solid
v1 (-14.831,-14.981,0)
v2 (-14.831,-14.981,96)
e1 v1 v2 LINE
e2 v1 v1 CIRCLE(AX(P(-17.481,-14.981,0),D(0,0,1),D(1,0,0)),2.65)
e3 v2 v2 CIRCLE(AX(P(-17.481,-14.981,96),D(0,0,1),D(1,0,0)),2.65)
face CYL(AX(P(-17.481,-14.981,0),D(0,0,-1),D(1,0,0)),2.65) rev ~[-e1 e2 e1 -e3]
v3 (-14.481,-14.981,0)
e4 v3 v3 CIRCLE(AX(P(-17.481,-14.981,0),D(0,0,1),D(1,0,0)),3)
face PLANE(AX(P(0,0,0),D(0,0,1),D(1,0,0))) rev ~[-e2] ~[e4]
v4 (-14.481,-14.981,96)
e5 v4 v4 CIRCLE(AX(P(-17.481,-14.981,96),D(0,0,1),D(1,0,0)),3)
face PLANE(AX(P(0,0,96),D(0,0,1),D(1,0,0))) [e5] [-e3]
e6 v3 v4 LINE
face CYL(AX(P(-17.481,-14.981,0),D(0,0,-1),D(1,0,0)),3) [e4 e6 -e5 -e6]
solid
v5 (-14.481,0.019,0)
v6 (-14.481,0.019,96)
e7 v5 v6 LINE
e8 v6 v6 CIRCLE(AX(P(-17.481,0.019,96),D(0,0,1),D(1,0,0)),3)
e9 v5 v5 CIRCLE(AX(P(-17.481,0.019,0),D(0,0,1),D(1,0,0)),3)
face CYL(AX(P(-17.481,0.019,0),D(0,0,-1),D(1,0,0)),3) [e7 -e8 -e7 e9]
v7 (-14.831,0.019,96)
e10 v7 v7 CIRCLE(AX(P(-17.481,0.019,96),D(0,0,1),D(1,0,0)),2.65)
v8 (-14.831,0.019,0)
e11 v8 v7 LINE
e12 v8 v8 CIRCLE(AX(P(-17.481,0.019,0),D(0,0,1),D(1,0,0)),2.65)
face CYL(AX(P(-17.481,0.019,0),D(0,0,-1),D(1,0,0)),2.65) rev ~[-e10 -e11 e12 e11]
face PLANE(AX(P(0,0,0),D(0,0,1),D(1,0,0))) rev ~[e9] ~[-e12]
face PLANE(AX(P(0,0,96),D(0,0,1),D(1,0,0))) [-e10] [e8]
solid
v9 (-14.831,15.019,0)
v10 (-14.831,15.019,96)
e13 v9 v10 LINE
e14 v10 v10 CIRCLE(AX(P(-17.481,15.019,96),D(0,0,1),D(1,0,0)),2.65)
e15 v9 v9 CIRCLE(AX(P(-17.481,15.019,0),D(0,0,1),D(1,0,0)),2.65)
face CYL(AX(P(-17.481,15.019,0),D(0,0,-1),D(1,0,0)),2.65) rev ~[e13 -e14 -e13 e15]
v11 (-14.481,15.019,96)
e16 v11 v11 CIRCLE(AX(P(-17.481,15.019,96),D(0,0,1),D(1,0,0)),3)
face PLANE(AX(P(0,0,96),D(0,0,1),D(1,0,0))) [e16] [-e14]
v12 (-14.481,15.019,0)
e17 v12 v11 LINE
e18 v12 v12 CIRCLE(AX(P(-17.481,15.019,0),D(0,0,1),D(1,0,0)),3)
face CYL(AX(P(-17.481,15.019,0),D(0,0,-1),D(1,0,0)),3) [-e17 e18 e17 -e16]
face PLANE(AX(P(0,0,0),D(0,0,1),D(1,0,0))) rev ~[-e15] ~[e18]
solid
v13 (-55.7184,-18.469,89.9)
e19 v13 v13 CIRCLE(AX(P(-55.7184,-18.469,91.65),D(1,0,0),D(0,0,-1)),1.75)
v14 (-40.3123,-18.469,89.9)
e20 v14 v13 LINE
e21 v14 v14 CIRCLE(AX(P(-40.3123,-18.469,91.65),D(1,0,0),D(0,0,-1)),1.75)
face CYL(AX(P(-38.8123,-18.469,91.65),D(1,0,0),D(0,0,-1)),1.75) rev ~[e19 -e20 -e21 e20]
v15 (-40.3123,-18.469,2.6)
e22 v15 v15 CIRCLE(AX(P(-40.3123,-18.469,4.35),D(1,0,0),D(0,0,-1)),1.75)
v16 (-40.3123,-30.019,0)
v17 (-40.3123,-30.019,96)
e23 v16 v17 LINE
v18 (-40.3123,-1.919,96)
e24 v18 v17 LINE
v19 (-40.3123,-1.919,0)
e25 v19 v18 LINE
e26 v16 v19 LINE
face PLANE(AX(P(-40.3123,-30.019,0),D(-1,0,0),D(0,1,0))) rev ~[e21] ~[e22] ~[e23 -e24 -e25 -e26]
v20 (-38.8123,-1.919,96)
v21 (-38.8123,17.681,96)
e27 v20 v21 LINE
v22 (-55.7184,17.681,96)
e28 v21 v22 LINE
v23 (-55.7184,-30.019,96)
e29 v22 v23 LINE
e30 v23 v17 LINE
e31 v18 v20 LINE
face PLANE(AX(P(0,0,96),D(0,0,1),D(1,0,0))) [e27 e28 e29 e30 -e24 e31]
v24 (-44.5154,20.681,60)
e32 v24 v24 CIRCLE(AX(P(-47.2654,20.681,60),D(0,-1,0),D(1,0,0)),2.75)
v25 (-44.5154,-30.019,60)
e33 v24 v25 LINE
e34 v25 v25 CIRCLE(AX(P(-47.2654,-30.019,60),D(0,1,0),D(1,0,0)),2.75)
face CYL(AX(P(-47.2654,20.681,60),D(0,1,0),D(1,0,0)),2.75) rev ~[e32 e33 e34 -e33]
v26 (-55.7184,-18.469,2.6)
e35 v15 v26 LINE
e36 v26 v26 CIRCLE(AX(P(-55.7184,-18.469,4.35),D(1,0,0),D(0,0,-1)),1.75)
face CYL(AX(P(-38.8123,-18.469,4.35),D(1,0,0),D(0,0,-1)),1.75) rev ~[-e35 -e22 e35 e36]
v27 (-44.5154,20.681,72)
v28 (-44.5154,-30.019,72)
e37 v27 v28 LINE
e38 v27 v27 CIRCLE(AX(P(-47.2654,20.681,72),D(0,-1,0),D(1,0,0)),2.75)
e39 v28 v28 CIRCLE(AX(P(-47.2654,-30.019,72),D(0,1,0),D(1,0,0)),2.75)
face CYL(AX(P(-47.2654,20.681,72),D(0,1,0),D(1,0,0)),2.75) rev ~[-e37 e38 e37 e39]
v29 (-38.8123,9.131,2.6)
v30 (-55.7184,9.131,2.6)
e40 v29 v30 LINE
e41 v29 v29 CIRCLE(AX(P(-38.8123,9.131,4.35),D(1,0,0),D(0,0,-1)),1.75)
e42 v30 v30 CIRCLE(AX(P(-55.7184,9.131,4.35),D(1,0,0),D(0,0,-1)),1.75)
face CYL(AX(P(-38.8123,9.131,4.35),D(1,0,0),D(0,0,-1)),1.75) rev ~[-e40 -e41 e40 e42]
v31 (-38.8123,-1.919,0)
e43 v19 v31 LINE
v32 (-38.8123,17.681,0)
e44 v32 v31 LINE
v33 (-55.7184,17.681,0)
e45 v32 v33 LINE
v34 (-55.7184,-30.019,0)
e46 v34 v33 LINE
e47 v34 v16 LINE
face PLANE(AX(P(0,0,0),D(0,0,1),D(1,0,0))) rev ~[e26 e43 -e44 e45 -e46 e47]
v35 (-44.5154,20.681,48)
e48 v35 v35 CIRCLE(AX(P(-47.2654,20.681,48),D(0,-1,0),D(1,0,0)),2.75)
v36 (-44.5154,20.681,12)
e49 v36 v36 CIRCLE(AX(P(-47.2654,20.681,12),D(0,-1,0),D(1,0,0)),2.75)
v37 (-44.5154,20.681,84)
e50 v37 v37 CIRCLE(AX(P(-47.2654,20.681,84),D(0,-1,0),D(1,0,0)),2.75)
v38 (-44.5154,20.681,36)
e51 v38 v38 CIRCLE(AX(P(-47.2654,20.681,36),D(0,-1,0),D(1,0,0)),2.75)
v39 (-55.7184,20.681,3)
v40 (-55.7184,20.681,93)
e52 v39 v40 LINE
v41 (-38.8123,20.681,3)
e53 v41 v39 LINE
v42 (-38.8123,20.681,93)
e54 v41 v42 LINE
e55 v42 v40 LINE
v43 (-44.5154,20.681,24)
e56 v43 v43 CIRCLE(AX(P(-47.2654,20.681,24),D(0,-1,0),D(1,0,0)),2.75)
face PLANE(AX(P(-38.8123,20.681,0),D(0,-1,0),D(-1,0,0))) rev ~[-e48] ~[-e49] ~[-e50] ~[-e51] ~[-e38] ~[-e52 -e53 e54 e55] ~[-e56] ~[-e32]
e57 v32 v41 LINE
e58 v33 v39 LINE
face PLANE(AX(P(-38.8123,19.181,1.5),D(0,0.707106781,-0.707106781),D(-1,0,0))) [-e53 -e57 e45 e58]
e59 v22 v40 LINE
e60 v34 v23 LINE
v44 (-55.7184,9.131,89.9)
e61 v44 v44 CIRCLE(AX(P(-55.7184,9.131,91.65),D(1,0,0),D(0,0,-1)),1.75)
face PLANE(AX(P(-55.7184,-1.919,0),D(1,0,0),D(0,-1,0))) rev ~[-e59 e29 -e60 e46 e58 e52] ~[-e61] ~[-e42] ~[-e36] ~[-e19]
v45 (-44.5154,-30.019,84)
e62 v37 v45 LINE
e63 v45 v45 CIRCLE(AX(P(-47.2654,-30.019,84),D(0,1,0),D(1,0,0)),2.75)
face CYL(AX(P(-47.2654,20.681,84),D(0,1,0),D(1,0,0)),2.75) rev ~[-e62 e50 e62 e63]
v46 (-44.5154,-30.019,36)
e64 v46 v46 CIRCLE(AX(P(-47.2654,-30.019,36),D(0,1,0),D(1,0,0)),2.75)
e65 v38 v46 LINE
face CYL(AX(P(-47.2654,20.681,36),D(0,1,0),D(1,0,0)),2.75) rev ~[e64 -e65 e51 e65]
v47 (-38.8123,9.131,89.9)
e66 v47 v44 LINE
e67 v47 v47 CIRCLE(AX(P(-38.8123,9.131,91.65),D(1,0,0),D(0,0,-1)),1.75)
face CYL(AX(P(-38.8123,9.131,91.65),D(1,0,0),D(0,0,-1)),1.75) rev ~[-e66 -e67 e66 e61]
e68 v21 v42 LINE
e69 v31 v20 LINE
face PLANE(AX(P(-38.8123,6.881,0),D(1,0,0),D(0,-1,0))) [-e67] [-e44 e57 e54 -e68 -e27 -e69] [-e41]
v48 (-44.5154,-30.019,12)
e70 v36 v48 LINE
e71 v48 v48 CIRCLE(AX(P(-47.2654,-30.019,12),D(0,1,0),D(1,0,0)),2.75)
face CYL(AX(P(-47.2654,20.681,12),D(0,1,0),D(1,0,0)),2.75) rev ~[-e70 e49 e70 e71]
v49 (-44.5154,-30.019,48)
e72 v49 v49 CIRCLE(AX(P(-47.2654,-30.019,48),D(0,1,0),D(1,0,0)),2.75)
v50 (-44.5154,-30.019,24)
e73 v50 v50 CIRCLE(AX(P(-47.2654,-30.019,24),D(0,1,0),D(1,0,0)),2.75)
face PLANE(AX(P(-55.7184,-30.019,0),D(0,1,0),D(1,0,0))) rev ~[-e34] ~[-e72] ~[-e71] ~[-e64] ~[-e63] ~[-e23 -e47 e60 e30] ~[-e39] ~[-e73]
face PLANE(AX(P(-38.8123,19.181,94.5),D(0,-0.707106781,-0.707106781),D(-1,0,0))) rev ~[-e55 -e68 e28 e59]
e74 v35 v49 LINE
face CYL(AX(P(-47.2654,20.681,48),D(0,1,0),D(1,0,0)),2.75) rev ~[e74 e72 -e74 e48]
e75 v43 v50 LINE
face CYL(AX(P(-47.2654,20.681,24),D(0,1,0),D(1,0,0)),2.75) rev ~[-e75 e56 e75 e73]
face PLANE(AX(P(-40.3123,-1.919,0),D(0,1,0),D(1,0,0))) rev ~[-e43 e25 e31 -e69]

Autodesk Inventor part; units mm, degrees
ref_plane "YZ Plane" through (0, 0, 0) normal (1, 0, 0) x (0, 1, 0)
ref_plane "XZ Plane" through (0, 0, 0) normal (0, 1, 0) x (-1, 0, 0)
ref_plane "XY Plane" through (0, 0, 0) normal (0, 0, 1) x (1, 0, 0)
ref_plane "Work Plane1" through (0, 0, 0) normal (0, 0, 1) x (1, 0, 0)
sketch "Sketch1" plane through (0, 0, 0) normal (0, 0, 1) x (1, 0, 0)
  line L0 (-40.3123, -16.219) -> (-40.3123, -1.919) projected
  line L1 (-38.8123, 20.681) -> (-36.2123, 20.681) projected
  line L2 (-38.8123, 20.681) -> (-38.8123, 11.381) projected
  line L3 (-38.8123, 6.881) -> (-38.8123, -7.419) projected
  line L4 (-38.8123, 11.381) -> (-38.8123, 6.881) projected
  line L5 (-55.7184, -30.019) -> (-40.3123, -30.019)
  line L6 (-40.3123, -30.019) -> (-40.3123, -1.919)
  line L7 (-40.3123, -1.919) -> (-55.7184, -1.919)
  line L8 (-55.7184, -1.919) -> (-55.7184, -30.019)
  line L9 (-55.7184, -1.919) -> (-38.8123, -1.919)
  line L10 (-38.8123, -1.919) -> (-38.8123, 20.681)
  line L11 (-38.8123, 20.681) -> (-55.7184, 20.681)
  line L12 (-55.7184, 20.681) -> (-55.7184, -1.919)
  circle A0 centre (-17.481, -14.981) radius 3 projected
  circle A1 centre (-17.481, 0.019) radius 3 projected
  circle A2 centre (-17.481, 15.019) radius 3 projected
  circle A3 centre (-17.481, 15.019) radius 2.65
  circle A4 centre (-17.481, -14.981) radius 2.65
  circle A5 centre (-17.481, 0.019) radius 2.65
  point P0 (0, 0)
  point P1 (-40.3123, -30.019)
  dimension "d9" = 6
  dimension "d10" = 5.3
  dimension "d11" = 5.3
  dimension "d12" = 5.3
extrude "Extrusion1" add sketch "Sketch1" along normal blind 96
sketch "Sketch2" plane through (-38.8123, -1.919, 0) normal (1, 0, 0) x (0, 0, -1)
  arc A0 (-4.35, 13.3) -> (-4.35, 8.8) centre (-4.35, 11.05) ccw projected
  arc A1 (-4.35, -14.3) -> (-4.35, -18.8) centre (-4.35, -16.55) ccw projected
  circle A2 centre (-4.35, 11.05) radius 1.75
  circle A3 centre (-4.35, -16.55) radius 1.75
  line L0 (-96, 22.6) -> (-96, -28.1) projected
  line L1 (0, 22.6) -> (0, -28.1) projected
  line L2 (-96, 22.6) -> (0, 22.6)
  line L3 (0, 22.6) -> (-48, 22.6)
  line L4 (-48, -36.2747) -> (-48, 22.6)
  circle A4 centre (-91.65, 11.05) radius 1.75
  circle A5 centre (-91.65, -16.55) radius 1.75
  point P0 (0, 1.919)
  dimension "d2" = 3.5
  dimension "d3" = 3.5
extrude "Extrusion2" cut sketch "Sketch2" against normal through all
chamfer "Chamfer1" distance 3 angle 45 2 edges at (-47.2653, 20.681, 0) (-47.2653, 20.681, 96)
sketch "Sketch3" plane through (-55.7184, 20.681, 93) normal (0, 1, 0) x (1, 0, 0)
  line L0 (0, -3) -> (16.9061, -3) projected
  line L1 (16.9061, -3) -> (0, -3)
  line L2 (8.453, -3) -> (8.453, 93)
  circle A0 centre (8.453, 9) radius 2.75
  line L3 (0, -3) -> (0, 93)
  line L4 (0, 93) -> (0, 45)
  line L5 (0, 90) -> (0, 0) projected
  line L6 (15.4061, 93) -> (15.4061, -3) projected
  line L7 (15.4061, 45) -> (0, 45)
  line L8 (35.5874, -3) -> (35.5874, 93) projected
  circle A1 centre (8.453, 21) radius 2.75
  circle A2 centre (8.453, 33) radius 2.75
  circle A3 centre (8.453, 45) radius 2.75
  line L9 (16.9061, 0) -> (0, 0) projected
  circle A4 centre (8.453, 81) radius 2.75
  circle A5 centre (8.453, 69) radius 2.75
  circle A6 centre (8.453, 57) radius 2.75
  point P0 (55.7184, 93)
  dimension "d13" = 5.5
  dimension "d14" = 12
  dimension "d15" = 5.5
  dimension "d16" = 12
  dimension "d17" = 5.5
  dimension "d18" = 12
  dimension "d19" = 5.5
  dimension "d20" = 45
  dimension "d21" = 48
  dimension "d22" = 12
  dimension "d23" = 12
extrude "Extrusion3" cut sketch "Sketch3" against normal through all contours A0 L2 | L2 A0 | A3 L2 L7 | L7 L2 A3 | L7 A3 L2 | L2 A3 L7 | A1 L2 | L2 A1 | A2 L2 | L2 A2 | A6 L2 | L2 A6 | A5 L2 | L2 A5 | A4 L2 | L2 A4
chamfer "Chamfer2" [suppressed]
properties part number "stepper motor controller mount"
